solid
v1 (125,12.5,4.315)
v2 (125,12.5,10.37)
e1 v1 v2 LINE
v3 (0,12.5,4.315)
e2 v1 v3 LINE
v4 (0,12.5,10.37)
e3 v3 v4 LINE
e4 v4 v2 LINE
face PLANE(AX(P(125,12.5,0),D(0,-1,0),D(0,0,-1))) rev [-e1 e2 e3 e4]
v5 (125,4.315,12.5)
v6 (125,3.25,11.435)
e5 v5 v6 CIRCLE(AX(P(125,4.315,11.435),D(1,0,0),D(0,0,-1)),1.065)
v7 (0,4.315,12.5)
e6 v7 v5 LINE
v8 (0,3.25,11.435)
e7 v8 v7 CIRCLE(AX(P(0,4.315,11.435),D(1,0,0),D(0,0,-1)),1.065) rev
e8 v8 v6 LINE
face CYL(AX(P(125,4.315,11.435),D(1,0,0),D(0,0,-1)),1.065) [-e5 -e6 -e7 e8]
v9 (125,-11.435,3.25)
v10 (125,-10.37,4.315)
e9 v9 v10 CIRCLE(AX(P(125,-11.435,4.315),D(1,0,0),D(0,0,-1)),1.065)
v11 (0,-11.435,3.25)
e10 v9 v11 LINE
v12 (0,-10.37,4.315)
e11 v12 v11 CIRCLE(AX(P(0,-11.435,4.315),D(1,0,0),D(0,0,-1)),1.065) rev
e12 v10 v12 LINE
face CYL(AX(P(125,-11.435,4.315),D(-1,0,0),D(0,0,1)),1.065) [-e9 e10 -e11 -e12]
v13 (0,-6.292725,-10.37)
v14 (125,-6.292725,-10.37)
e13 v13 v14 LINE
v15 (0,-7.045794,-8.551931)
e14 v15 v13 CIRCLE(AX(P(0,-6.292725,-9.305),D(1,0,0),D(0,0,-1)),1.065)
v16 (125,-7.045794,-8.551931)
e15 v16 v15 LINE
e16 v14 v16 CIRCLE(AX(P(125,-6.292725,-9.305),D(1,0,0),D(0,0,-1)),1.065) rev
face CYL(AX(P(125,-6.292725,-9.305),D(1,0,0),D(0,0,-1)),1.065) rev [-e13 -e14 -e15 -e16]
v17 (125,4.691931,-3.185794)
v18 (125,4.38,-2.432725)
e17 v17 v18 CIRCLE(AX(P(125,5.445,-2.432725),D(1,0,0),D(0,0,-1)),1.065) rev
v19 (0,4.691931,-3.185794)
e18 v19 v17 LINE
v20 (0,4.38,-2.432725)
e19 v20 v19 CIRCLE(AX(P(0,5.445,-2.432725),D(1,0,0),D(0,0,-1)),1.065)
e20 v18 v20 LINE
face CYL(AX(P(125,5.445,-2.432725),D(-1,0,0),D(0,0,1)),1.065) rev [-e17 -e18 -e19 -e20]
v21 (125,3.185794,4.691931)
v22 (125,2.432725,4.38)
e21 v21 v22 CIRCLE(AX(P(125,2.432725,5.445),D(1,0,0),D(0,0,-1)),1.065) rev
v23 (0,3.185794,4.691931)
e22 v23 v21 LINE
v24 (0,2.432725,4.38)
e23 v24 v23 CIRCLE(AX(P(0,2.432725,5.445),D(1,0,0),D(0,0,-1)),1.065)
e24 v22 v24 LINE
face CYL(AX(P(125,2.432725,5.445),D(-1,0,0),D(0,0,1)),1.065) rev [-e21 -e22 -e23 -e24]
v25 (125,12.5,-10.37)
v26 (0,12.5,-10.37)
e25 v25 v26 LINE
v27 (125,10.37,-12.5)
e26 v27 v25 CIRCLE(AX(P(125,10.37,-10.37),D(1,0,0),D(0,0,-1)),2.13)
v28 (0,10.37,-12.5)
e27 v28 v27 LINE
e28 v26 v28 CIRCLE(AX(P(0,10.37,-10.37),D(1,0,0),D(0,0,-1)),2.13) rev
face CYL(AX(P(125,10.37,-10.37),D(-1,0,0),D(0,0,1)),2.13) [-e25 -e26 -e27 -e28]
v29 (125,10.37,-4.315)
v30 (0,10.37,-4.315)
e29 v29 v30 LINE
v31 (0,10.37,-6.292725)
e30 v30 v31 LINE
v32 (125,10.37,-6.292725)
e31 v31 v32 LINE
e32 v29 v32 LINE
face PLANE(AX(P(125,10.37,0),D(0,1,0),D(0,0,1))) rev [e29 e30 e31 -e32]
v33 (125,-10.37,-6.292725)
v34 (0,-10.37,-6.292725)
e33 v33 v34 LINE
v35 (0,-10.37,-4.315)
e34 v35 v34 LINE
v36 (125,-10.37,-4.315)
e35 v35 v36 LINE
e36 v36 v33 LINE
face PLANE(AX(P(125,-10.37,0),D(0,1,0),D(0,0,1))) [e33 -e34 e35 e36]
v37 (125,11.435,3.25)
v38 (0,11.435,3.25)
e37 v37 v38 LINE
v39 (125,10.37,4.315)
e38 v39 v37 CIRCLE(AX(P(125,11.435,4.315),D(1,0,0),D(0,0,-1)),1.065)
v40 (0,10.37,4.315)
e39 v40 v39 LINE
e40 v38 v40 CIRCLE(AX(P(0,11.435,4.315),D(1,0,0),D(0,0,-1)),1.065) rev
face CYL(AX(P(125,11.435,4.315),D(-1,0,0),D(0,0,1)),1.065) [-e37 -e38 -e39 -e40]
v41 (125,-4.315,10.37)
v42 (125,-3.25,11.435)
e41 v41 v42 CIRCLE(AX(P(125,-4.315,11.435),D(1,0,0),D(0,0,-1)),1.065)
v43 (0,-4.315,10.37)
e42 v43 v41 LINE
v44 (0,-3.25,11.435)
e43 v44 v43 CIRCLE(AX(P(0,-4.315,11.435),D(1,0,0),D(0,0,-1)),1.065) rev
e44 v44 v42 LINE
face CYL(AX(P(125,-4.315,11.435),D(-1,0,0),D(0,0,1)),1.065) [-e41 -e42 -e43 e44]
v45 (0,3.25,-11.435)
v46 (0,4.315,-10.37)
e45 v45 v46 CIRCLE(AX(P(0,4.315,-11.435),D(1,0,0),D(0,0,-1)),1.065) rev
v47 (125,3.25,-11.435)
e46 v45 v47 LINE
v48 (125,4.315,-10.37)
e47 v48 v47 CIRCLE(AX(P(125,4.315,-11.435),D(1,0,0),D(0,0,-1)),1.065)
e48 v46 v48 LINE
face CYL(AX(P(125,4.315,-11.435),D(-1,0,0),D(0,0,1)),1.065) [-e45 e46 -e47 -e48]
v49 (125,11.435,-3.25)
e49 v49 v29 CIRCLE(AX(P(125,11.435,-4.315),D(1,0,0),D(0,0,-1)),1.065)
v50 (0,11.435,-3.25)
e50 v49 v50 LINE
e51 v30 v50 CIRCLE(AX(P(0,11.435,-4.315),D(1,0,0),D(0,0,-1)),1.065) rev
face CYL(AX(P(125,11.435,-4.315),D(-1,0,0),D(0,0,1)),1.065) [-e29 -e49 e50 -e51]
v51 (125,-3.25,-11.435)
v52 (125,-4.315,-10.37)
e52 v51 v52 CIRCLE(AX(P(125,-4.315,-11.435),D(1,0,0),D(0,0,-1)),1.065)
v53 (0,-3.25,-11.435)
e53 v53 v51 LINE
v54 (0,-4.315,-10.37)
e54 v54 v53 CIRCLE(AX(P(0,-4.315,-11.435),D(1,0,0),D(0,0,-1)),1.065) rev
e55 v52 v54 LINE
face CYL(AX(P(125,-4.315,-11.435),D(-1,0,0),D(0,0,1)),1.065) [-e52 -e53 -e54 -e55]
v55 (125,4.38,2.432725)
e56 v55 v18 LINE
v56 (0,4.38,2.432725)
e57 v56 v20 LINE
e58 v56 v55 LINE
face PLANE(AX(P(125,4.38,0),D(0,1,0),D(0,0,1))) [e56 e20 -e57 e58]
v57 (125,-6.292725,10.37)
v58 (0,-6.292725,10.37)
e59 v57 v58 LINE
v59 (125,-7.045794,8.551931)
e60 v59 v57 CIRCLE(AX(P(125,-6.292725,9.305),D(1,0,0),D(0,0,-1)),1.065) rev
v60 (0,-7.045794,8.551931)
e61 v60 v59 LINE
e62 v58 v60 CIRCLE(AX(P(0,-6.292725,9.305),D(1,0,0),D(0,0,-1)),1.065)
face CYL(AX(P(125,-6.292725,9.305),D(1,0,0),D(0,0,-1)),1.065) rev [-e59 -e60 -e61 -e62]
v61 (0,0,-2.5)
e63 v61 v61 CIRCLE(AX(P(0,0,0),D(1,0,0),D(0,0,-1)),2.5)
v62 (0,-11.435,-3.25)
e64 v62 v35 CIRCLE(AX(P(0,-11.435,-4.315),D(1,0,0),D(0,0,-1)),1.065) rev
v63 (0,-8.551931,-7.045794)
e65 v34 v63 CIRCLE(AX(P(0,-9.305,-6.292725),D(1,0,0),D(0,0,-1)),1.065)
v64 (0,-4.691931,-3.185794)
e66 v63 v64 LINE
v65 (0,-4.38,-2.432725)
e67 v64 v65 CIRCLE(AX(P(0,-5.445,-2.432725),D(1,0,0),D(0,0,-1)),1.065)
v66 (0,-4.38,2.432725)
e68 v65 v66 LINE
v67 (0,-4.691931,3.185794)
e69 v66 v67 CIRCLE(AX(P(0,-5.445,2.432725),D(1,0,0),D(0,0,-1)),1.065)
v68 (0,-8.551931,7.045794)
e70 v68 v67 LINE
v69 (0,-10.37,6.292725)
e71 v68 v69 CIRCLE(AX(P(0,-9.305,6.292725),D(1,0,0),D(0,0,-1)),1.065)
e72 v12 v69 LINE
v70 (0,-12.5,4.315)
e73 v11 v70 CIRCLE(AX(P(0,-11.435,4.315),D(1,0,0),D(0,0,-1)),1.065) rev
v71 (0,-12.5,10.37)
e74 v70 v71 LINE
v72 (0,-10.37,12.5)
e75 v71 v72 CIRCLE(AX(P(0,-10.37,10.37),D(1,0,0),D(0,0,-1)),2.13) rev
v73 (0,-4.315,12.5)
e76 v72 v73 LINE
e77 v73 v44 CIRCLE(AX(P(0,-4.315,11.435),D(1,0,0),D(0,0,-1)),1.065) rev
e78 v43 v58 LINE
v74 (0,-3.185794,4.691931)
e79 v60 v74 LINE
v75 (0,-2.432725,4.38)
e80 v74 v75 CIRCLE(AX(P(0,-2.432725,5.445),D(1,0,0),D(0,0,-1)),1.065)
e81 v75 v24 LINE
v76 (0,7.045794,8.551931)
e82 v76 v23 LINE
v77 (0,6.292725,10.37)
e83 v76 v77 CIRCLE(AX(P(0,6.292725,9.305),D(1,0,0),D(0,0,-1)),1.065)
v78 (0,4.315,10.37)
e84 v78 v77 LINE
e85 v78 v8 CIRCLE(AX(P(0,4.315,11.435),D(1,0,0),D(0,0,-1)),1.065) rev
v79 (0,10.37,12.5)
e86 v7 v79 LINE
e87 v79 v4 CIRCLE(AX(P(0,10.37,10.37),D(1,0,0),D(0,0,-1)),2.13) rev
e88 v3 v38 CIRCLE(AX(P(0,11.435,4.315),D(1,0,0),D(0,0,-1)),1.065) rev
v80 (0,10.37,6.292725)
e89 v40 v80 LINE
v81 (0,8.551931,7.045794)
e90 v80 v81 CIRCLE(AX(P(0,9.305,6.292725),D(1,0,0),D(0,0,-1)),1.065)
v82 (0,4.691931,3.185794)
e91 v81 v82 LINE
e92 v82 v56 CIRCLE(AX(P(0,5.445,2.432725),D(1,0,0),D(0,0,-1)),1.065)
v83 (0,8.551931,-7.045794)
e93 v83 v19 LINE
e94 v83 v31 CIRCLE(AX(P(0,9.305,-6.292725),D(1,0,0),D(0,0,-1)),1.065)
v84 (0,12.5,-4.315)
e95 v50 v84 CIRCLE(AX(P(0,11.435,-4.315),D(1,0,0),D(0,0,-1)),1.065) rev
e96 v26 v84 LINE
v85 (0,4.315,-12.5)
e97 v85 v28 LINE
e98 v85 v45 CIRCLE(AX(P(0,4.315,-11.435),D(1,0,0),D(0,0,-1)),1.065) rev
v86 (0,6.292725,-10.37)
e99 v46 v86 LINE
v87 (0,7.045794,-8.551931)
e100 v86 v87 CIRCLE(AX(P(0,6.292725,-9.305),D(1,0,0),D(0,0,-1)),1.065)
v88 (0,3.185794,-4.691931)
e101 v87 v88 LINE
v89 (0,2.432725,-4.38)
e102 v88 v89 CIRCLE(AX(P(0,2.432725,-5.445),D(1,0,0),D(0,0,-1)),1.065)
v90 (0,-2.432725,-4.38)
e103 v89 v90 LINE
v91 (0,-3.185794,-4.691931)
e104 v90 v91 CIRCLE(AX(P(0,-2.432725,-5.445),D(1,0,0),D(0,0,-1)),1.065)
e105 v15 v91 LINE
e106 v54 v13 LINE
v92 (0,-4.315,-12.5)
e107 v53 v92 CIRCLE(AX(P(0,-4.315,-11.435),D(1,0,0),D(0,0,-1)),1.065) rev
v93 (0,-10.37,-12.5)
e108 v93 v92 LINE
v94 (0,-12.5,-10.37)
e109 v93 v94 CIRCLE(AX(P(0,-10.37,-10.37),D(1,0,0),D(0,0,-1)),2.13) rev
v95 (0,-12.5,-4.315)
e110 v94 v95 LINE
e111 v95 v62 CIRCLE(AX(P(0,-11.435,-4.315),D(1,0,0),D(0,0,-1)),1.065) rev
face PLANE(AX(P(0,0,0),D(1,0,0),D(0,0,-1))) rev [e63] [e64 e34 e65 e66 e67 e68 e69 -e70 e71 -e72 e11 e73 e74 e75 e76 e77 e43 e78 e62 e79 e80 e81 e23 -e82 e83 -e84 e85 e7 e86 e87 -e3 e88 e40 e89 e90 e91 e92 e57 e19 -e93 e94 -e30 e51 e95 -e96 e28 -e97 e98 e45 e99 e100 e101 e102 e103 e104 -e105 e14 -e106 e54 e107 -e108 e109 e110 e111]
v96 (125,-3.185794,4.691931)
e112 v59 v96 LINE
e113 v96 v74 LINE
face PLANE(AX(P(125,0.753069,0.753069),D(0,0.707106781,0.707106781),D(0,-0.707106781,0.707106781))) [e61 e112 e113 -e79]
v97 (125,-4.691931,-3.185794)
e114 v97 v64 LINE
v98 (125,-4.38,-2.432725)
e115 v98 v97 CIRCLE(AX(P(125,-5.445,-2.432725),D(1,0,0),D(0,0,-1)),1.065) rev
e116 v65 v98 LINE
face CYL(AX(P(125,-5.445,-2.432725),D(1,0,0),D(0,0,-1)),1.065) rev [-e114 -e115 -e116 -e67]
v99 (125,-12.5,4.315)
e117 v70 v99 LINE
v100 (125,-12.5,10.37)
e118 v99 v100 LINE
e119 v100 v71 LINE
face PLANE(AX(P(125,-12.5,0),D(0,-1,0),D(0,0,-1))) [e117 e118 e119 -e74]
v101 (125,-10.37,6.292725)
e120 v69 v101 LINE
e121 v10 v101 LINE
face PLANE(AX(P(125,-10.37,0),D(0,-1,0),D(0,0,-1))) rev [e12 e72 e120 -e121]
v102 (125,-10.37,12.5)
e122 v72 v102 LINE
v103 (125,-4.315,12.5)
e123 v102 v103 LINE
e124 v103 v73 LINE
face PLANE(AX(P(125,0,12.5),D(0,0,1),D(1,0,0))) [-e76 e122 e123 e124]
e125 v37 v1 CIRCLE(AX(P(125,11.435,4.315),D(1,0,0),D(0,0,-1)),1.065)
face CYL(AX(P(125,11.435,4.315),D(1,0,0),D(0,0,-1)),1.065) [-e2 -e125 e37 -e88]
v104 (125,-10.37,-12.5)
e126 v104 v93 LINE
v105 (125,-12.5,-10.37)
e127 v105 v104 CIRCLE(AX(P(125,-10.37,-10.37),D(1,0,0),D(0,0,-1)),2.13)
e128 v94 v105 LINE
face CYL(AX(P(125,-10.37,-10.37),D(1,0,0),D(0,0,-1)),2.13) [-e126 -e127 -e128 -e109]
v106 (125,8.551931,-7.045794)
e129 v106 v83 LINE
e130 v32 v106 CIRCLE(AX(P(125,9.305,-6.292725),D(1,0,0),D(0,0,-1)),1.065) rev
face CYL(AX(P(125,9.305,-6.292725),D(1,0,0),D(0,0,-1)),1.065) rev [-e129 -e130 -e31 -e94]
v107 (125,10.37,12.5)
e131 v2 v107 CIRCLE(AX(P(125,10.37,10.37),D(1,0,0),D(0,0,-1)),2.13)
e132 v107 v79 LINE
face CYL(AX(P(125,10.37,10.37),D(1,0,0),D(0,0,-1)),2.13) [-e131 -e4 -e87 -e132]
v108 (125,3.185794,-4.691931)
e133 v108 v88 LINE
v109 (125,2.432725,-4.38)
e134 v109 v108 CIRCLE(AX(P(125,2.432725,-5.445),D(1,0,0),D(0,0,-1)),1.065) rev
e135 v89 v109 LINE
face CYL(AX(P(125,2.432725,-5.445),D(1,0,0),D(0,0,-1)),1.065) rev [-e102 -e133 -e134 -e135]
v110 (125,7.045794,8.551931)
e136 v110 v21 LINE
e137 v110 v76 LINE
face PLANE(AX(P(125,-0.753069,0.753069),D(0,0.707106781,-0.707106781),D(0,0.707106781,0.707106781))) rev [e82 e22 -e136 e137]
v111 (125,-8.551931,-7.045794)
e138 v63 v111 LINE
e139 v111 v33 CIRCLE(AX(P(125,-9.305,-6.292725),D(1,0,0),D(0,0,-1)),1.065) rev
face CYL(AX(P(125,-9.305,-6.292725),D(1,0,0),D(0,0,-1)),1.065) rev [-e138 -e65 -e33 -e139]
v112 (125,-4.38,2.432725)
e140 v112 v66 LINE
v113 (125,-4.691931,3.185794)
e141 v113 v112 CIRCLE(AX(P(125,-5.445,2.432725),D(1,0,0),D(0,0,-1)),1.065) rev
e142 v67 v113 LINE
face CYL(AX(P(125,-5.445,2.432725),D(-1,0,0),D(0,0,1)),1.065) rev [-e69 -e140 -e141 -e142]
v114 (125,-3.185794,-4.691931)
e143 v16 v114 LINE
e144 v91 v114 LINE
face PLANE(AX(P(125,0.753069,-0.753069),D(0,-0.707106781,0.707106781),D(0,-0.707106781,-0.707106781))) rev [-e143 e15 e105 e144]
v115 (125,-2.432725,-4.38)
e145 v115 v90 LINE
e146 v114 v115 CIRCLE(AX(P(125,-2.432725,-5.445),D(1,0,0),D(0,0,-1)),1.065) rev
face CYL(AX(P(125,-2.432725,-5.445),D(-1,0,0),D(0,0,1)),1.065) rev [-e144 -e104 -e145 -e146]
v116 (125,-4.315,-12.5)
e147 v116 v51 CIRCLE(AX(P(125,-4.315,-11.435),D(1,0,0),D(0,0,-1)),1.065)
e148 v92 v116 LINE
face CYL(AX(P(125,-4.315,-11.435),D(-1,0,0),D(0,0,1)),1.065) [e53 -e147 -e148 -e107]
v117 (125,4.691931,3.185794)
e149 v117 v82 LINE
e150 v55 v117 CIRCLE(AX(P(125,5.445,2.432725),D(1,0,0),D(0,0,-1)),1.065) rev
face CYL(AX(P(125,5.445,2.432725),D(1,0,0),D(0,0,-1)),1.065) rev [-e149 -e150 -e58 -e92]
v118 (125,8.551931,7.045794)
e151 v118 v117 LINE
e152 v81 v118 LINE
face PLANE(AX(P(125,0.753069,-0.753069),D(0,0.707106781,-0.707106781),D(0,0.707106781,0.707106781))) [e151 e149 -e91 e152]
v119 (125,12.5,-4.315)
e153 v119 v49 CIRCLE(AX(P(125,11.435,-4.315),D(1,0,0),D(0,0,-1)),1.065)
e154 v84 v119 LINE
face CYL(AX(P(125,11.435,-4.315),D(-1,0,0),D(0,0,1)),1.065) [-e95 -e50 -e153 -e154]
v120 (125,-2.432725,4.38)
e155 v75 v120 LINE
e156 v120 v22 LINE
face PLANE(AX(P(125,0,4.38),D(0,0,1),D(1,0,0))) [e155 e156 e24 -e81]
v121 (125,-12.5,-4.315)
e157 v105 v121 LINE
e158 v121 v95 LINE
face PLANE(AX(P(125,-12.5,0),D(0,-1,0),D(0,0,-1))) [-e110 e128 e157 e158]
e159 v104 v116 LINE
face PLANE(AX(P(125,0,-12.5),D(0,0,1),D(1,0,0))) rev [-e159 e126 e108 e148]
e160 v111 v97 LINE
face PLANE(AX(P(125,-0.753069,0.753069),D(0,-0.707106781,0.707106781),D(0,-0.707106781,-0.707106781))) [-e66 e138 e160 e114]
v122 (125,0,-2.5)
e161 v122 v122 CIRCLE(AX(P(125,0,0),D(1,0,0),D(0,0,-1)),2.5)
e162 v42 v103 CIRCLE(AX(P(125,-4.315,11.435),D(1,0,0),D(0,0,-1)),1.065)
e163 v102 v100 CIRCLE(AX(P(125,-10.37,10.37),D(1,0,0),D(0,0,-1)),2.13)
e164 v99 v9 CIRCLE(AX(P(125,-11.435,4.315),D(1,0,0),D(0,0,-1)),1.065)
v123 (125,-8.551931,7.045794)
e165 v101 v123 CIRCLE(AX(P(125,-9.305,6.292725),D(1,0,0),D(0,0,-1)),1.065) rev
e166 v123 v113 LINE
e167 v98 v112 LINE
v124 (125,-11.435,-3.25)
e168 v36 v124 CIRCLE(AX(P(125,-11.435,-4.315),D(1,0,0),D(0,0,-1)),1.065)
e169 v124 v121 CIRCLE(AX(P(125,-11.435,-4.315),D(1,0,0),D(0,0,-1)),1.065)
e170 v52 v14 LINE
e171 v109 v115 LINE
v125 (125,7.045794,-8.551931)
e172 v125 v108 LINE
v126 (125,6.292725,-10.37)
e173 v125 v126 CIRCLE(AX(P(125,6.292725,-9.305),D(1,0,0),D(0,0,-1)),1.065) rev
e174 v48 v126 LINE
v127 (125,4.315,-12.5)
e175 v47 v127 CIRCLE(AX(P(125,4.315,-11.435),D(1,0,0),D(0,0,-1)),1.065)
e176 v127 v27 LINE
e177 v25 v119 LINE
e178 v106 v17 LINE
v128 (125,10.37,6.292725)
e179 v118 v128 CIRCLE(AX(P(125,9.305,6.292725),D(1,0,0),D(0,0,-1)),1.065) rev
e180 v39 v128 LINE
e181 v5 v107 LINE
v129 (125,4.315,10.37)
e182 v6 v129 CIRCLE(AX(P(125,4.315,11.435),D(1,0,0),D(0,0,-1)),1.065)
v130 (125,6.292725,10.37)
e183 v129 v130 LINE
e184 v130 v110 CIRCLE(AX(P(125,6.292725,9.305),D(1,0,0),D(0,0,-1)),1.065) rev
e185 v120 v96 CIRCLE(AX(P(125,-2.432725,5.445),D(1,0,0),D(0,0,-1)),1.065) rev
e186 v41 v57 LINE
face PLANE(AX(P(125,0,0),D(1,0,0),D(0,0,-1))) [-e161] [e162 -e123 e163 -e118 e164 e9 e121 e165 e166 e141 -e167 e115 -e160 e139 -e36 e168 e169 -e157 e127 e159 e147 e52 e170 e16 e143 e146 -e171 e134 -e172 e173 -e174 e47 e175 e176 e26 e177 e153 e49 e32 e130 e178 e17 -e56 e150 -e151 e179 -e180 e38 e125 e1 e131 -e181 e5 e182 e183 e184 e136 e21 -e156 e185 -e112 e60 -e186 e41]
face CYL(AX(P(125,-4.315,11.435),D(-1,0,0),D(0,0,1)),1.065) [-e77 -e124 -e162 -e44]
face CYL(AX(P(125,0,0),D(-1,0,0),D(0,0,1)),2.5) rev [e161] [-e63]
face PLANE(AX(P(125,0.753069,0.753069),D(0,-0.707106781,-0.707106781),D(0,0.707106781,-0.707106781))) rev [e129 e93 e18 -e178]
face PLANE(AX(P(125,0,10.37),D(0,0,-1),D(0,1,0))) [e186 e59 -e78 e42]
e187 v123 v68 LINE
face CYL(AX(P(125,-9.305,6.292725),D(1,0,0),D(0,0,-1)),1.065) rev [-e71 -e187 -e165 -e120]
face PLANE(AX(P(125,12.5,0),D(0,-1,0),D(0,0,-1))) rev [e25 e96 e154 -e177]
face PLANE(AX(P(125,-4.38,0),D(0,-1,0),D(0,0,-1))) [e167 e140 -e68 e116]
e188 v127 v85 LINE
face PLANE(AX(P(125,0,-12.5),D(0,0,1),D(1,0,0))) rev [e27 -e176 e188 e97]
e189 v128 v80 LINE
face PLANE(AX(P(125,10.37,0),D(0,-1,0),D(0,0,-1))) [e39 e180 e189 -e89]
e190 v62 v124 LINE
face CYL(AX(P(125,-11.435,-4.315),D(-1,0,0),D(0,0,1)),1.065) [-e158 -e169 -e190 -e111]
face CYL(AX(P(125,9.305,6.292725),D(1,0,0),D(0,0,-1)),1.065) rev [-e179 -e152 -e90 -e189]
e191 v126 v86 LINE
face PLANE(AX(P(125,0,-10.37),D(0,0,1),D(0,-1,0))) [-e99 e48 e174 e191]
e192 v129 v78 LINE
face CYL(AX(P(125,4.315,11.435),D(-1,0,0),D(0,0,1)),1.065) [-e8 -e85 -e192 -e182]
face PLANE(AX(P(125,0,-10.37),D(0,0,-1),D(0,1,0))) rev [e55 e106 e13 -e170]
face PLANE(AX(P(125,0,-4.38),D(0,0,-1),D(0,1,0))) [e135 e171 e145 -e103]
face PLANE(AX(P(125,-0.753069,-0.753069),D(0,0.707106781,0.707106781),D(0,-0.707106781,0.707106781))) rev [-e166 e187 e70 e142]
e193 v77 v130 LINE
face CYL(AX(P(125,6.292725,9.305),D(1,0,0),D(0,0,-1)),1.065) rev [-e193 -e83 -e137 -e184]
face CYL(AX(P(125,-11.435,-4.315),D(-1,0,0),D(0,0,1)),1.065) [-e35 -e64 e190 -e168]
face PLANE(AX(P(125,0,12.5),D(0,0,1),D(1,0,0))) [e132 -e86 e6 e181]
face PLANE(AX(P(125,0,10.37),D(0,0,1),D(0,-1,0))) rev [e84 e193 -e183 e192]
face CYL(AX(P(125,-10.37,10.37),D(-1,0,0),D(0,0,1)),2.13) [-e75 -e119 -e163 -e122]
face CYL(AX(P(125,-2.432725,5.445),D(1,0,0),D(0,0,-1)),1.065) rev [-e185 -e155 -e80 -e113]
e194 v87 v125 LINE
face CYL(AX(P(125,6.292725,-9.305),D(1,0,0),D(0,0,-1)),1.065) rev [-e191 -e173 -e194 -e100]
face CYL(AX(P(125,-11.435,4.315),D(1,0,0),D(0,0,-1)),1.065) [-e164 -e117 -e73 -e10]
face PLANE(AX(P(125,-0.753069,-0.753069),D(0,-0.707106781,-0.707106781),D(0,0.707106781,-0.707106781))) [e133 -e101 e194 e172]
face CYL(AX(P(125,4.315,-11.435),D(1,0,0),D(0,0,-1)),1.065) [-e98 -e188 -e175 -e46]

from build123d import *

# Parameters (mm, degrees)
SKETCH1_R           = 2.5
BOSS_EXTRUDE1_DEPTH = 125
FILLET1_R           = 1.065
FILLET2_R           = 2.13


with BuildPart() as part:
    # Sketch1 → Boss-Extrude1 (new body)
    with BuildSketch(Plane.YZ):
        Polygon((-12.5, -3.25), (-12.5, -12.5), (-3.25, -12.5), (-3.25, -10.37), (-8.863862556, -10.37), (-2.873862556, -4.38), (2.873862556, -4.38), (8.863862556, -10.37), (3.25, -10.37), (3.25, -12.5), (12.5, -12.5), (12.5, -3.25), (10.37, -3.25), (10.37, -8.863862556), (4.38, -2.873862556), (4.38, 2.873862556), (10.37, 8.863862556), (10.37, 3.25), (12.5, 3.25), (12.5, 12.5), (3.25, 12.5), (3.25, 10.37), (8.863862556, 10.37), (2.873862556, 4.38), (-2.873862556, 4.38), (-8.863862556, 10.37), (-3.25, 10.37), (-3.25, 12.5), (-12.5, 12.5), (-12.5, 3.25), (-10.37, 3.25), (-10.37, 8.863862556), (-4.38, 2.873862556), (-4.38, -2.873862556), (-10.37, -8.863862556), (-10.37, -3.25), align=None)
        with Locations(Location((0, 0, 0), (0, 0, 270))):
            Circle(SKETCH1_R, mode=Mode.SUBTRACT)
    extrude(amount=BOSS_EXTRUDE1_DEPTH)

    # Fillet1
    fillet1_edges = [part.edges().sort_by_distance(p)[0] for p in [
        (62.5, -10.37, -8.863862556),
        (62.5, 2.873862556, -4.38),
        (62.5, -2.873862556, -4.38),
        (62.5, -4.38, 2.873862556),
        (62.5, -4.38, -2.873862556),
        (62.5, -2.873862556, 4.38),
        (62.5, 2.873862556, 4.38),
        (62.5, 4.38, 2.873862556),
        (62.5, 4.38, -2.873862556),
        (62.5, -8.863862556, -10.37),
        (62.5, 8.863862556, -10.37),
        (62.5, 10.37, -8.863862556),
        (62.5, -10.37, 8.863862556),
        (62.5, -8.863862556, 10.37),
        (62.5, 10.37, 8.863862556),
        (62.5, 8.863862556, 10.37),
        (62.5, 12.5, 3.25),
        (62.5, -3.25, -12.5),
        (62.5, -10.37, 3.25),
        (62.5, 10.37, 3.25),
        (62.5, -10.37, -3.25),
        (62.5, -12.5, -3.25),
        (62.5, -12.5, 3.25),
        (62.5, 3.25, -10.37),
        (62.5, -3.25, -10.37),
        (62.5, 3.25, -12.5),
        (62.5, 10.37, -3.25),
        (62.5, 12.5, -3.25),
        (62.5, 3.25, 12.5),
        (62.5, 3.25, 10.37),
        (62.5, -3.25, 10.37),
        (62.5, -3.25, 12.5),
    ]]
    fillet(fillet1_edges, radius=FILLET1_R - 0.0001)  # a hair under: the kernel refuses the full size

    # Fillet2
    fillet2_edges = [part.edges().sort_by_distance(p)[0] for p in [
        (62.5, -12.5, 12.5),
        (62.5, 12.5, 12.5),
        (62.5, 12.5, -12.5),
        (62.5, -12.5, -12.5),
    ]]
    fillet(fillet2_edges, radius=FILLET2_R)


solid = part.part
